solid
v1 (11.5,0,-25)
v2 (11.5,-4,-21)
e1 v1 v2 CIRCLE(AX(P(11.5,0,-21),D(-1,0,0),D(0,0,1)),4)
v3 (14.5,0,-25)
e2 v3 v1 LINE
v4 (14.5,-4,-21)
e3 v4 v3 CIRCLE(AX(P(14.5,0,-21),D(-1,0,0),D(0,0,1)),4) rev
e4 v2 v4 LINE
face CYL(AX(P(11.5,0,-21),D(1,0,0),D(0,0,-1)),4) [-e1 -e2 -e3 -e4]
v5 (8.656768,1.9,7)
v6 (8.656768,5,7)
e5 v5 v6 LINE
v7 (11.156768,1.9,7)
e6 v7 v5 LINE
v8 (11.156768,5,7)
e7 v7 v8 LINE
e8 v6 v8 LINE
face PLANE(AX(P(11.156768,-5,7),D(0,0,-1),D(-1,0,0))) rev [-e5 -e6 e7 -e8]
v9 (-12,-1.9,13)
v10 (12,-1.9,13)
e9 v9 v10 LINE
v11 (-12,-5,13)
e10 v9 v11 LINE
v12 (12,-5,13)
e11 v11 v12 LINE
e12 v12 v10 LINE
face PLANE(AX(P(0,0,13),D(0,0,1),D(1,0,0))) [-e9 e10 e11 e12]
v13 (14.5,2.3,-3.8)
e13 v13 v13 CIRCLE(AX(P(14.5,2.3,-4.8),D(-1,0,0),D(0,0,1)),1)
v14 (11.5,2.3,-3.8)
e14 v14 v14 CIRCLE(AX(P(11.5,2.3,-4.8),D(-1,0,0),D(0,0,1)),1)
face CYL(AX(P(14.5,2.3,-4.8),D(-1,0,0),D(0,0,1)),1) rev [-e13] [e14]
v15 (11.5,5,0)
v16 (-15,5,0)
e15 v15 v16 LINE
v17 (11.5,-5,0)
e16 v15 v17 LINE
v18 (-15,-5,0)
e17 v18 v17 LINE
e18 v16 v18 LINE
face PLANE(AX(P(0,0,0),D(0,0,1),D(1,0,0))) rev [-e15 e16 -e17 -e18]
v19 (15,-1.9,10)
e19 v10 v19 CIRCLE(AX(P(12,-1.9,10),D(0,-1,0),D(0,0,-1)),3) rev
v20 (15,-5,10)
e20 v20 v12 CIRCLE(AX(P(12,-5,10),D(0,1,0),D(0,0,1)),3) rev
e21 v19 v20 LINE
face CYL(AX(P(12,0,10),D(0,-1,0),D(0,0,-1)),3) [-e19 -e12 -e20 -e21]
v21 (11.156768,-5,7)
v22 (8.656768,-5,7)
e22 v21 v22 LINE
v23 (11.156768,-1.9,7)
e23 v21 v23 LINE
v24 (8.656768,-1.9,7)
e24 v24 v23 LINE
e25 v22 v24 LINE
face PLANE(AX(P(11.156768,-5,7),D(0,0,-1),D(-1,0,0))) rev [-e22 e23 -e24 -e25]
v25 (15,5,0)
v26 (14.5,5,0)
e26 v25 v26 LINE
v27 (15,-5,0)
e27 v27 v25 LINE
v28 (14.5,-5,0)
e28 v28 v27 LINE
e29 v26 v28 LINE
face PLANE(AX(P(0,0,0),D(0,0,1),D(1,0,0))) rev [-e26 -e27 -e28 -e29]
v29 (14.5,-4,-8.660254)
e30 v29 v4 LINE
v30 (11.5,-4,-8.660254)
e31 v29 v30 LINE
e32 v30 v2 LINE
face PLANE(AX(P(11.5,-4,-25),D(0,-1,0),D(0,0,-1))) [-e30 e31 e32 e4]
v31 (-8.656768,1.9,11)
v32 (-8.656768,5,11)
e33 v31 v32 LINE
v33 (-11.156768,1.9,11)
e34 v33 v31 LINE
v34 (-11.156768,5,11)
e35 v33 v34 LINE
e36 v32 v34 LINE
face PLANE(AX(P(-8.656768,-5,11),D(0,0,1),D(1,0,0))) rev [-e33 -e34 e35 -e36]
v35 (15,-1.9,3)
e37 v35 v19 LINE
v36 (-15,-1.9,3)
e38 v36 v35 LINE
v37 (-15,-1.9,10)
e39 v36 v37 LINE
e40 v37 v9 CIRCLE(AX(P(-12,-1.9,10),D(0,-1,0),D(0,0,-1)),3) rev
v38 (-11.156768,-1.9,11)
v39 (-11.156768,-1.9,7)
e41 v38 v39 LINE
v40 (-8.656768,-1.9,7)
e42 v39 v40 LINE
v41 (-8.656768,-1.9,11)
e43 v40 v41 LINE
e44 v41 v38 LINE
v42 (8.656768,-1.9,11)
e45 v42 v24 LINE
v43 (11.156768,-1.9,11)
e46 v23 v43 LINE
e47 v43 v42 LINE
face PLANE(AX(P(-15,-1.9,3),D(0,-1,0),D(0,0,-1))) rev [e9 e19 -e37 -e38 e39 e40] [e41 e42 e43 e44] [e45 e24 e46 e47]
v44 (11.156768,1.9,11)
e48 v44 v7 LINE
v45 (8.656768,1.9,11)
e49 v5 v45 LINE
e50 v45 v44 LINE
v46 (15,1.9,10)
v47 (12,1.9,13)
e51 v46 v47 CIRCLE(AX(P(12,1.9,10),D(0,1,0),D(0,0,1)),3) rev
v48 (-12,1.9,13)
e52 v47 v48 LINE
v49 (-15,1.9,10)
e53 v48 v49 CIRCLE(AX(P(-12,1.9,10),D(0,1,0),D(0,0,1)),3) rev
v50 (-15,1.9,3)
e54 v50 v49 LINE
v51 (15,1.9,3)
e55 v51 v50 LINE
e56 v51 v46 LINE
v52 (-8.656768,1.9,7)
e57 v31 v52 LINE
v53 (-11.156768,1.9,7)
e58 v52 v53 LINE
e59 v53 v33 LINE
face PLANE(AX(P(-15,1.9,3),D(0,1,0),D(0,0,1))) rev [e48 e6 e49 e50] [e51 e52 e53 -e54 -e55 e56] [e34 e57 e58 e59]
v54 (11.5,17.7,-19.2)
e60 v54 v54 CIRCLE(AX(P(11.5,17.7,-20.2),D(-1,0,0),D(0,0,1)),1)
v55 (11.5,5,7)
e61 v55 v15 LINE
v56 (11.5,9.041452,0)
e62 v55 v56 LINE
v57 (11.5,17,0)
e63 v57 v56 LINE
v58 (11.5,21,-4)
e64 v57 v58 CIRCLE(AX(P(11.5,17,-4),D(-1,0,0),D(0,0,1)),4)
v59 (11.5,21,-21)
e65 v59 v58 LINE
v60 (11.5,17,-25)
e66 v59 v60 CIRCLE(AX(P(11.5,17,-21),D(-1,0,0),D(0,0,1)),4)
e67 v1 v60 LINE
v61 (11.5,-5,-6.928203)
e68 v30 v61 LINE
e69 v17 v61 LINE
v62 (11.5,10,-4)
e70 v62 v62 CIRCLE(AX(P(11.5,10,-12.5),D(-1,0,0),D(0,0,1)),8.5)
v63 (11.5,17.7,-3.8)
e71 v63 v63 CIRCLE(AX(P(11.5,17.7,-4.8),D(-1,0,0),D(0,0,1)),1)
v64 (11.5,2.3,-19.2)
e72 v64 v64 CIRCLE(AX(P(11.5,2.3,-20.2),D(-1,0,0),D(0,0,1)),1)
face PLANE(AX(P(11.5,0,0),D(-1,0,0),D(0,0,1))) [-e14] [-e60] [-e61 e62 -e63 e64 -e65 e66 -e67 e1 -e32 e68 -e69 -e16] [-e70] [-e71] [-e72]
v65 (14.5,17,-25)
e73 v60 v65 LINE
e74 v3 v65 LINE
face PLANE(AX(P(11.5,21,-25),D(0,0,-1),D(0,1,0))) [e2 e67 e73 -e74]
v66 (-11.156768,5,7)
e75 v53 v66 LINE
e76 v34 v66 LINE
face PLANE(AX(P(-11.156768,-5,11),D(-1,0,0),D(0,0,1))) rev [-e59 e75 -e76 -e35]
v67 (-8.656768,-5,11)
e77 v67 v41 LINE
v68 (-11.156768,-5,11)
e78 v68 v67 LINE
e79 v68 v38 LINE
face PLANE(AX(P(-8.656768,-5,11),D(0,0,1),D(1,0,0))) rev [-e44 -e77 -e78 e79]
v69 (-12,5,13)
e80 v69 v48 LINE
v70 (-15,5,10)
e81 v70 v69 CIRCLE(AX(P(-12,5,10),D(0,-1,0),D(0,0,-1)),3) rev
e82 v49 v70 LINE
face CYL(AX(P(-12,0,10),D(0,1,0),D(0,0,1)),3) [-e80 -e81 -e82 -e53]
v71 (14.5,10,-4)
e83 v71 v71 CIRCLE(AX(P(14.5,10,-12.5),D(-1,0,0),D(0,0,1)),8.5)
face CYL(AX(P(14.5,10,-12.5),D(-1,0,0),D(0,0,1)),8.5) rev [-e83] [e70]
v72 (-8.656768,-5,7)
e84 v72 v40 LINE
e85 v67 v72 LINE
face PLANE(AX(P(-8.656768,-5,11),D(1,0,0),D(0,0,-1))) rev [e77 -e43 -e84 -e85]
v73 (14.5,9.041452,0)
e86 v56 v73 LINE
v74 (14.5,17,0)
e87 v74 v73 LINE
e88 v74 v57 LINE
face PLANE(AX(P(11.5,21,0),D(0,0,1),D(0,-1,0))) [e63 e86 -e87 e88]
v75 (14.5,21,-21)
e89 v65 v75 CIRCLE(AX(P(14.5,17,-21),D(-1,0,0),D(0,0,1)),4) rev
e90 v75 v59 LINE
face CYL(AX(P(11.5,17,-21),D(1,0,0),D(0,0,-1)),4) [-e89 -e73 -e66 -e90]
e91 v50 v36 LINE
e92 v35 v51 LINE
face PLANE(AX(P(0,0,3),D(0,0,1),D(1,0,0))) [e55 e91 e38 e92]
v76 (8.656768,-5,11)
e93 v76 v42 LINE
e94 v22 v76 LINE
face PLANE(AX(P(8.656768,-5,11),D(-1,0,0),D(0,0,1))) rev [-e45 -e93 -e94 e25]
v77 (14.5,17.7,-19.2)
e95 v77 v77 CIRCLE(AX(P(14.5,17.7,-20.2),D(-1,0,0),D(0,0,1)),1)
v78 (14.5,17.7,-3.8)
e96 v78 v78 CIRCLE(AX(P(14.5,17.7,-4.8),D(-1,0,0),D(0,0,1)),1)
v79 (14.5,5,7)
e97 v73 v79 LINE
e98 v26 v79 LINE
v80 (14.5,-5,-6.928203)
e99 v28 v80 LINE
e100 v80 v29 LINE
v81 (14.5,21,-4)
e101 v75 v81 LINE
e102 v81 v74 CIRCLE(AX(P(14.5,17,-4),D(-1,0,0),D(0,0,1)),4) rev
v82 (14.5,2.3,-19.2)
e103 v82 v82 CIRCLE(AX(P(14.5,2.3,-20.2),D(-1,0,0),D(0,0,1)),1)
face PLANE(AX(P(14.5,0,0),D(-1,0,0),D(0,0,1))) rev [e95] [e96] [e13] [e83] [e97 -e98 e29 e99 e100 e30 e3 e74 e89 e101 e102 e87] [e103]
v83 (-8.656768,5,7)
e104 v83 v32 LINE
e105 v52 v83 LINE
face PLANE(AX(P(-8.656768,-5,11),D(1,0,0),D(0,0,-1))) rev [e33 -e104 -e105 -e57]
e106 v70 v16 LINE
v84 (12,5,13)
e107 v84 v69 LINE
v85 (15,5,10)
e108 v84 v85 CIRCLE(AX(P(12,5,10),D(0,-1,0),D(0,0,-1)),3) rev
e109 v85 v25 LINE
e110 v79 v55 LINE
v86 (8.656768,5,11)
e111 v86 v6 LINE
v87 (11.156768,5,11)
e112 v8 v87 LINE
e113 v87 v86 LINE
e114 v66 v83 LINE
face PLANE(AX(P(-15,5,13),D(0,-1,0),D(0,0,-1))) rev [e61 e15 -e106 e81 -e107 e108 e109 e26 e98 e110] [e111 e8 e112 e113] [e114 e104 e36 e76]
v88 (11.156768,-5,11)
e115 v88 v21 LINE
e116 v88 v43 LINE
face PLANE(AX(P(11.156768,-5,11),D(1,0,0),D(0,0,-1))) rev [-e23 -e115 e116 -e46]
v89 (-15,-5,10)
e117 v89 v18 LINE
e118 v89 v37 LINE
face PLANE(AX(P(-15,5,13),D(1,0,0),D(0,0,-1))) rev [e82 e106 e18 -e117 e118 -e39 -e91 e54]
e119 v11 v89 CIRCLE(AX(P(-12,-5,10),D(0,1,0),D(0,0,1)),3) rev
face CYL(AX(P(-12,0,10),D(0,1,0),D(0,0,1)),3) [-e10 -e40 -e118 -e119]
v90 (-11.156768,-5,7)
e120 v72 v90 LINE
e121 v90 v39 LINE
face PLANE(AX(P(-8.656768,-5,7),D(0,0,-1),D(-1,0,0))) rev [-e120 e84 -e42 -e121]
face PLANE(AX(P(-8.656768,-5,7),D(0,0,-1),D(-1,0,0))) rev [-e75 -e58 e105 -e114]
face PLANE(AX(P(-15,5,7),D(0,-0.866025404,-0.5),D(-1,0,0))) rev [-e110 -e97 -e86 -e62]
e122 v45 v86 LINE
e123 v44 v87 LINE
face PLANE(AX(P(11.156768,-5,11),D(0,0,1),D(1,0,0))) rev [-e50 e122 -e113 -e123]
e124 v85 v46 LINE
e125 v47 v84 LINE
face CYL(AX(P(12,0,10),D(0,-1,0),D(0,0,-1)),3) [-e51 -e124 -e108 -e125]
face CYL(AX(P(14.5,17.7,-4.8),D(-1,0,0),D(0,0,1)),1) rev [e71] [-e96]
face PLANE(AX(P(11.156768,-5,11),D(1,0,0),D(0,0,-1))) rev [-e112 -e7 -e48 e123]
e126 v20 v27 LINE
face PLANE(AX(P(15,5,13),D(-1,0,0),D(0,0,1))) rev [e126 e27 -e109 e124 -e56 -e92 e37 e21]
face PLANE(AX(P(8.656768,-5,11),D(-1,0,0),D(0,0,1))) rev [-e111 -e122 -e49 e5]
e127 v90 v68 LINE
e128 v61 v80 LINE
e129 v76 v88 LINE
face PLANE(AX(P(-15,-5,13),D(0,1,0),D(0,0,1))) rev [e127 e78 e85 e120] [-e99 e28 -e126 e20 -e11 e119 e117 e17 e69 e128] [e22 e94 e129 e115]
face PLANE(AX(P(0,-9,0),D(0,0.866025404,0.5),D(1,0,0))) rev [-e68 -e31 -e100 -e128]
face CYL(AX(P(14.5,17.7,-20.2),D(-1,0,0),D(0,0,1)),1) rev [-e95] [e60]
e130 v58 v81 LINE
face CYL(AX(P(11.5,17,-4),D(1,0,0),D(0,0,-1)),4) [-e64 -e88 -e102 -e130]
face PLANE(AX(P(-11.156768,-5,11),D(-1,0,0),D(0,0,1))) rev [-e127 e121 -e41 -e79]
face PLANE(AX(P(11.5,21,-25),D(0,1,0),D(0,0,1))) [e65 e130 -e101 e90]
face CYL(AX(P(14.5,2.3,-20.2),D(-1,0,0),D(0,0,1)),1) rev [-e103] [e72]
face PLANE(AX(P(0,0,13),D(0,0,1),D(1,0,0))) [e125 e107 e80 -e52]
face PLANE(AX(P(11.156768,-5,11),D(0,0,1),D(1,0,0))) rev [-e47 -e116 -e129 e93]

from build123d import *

# Parameters (mm, degrees)
ESBO_O1_W                  = 30
ESBO_O1_H                  = 10
RESSALTO_EXTRUS_O1_DEPTH   = 13
ESBO_O2_W                  = 30
ESBO_O2_H                  = 3.8
CORTE_EXTRUS_O1_DEPTH      = 10
FILETE1_R                  = 3
CORTE_EXTRUS_O2_DEPTH      = 23.226110771
CORTE_EXTRUS_O2_DEPTH_BACK = 23.226110771
ESBO_O3_W                  = 2.5
ESBO_O3_H                  = 4
ESBO_O4_W                  = 25
ESBO_O4_H                  = 25
RESSALTO_EXTRUS_O2_DEPTH   = 1.5
CHANFRO1_SIZE              = 5
CHANFRO1_SIZE_2            = 8.660254038
CHANFRO2_SIZE              = 7
CHANFRO2_SIZE2             = 4.041451884
ESBO_O5_R                  = 8.5
ESBO_O5_R_2                = 1
CORTE_EXTRUS_O3_DEPTH      = 3
FILETE2_R                  = 4


with BuildPart() as part:
    # Esboço1 → Ressalto-extrusão1 (new body)
    with BuildSketch(Plane.XY):
        Rectangle(ESBO_O1_W, ESBO_O1_H)
    extrude(amount=RESSALTO_EXTRUS_O1_DEPTH)

    # Esboço2 → Corte-extrusão1 (cut)
    with BuildSketch(Plane.XY.offset(13)):
        Rectangle(ESBO_O2_W, ESBO_O2_H)
    extrude(amount=-CORTE_EXTRUS_O1_DEPTH, mode=Mode.SUBTRACT)

    # Filete1
    filete1_edges = [part.edges().sort_by_distance(p)[0] for p in [
        (-15, 3.45, 13),
        (15, 3.45, 13),
        (-15, -3.45, 13),
        (15, -3.45, 13),
    ]]
    fillet(filete1_edges, radius=FILETE1_R)

    # Esboço3 → Corte-extrusão2 (cut, two sides: drawn at the far end of the back side and taken through both)
    with BuildSketch(Plane(origin=(0, 5, 0), x_dir=(1, 0, 0), z_dir=(0, 1, 0)).offset(-CORTE_EXTRUS_O2_DEPTH_BACK)):
        with Locations((9.906768391, -9)):
            Rectangle(ESBO_O3_W, ESBO_O3_H)
        with Locations((-9.906768391, -9)):
            Rectangle(ESBO_O3_W, ESBO_O3_H)
    extrude(amount=CORTE_EXTRUS_O2_DEPTH + CORTE_EXTRUS_O2_DEPTH_BACK, mode=Mode.SUBTRACT)

    # Esboço4 → Ressalto-extrusão2 (add, symmetric)
    with BuildSketch(Plane(origin=(13, 0, 0), x_dir=(0, 0, -1), z_dir=(1, 0, 0))):
        with Locations((12.5, 8.5)):
            Rectangle(ESBO_O4_W, ESBO_O4_H)
    extrude(amount=RESSALTO_EXTRUS_O2_DEPTH, both=True)

    # Chanfro1
    # the kernel refuses this chamfer: 8.660254038, 5 mm, written as the material it adds along each edge
    with BuildSketch(Plane(origin=(11.5, -4, 0), x_dir=(0, -0.9983227437537924, 0.05789386240267202), z_dir=(1, 0, 0))) as chanfro1_piece_1_section:
        Polygon((CHANFRO1_SIZE * 0.998322743754, CHANFRO1_SIZE * 0.0578938624027), (-CHANFRO1_SIZE_2 * 0.0578938624016, CHANFRO1_SIZE_2 * 0.998322743736), (0, 0), align=None)
    chanfro1_piece_1 = extrude(amount=3, mode=Mode.PRIVATE)
    chanfro1_piece_1 = split(chanfro1_piece_1, bisect_by=Plane(origin=(13, -5, -4.055902091), z_dir=(0, 1, 0)), keep=Keep.TOP, mode=Mode.PRIVATE)
    add(chanfro1_piece_1)

    # Chanfro2
    chanfro2_edges = [part.edges().sort_by_distance(p)[0] for p in [
        (13, 5, 0),
    ]]
    chanfro2_side = [part.faces().sort_by_distance(p)[0] for p in [
        (0, 5, 6.301932384),
    ]]
    chamfer(chanfro2_edges, length=CHANFRO2_SIZE, length2=CHANFRO2_SIZE2, reference=chanfro2_side[0])

    # Esboço5 → Corte-extrusão3 (cut)
    with BuildSketch(Plane.ZY.offset(-11.5)):
        with Locations((-12.5, 10)):
            Circle(ESBO_O5_R)
        with Locations((-20.2, 17.7)):
            Circle(ESBO_O5_R_2)
        with Locations((-4.8, 17.7)):
            Circle(ESBO_O5_R_2)
        with Locations((-4.8, 2.3)):
            Circle(ESBO_O5_R_2)
        with Locations((-20.2, 2.3)):
            Circle(ESBO_O5_R_2)
    extrude(amount=-CORTE_EXTRUS_O3_DEPTH, mode=Mode.SUBTRACT)

    # Filete2
    filete2_edges = [part.edges().sort_by_distance(p)[0] for p in [
        (13, 21, 0),
        (13, 21, -25),
        (13, -4, -25),
    ]]
    fillet(filete2_edges, radius=FILETE2_R)


solid = part.part
